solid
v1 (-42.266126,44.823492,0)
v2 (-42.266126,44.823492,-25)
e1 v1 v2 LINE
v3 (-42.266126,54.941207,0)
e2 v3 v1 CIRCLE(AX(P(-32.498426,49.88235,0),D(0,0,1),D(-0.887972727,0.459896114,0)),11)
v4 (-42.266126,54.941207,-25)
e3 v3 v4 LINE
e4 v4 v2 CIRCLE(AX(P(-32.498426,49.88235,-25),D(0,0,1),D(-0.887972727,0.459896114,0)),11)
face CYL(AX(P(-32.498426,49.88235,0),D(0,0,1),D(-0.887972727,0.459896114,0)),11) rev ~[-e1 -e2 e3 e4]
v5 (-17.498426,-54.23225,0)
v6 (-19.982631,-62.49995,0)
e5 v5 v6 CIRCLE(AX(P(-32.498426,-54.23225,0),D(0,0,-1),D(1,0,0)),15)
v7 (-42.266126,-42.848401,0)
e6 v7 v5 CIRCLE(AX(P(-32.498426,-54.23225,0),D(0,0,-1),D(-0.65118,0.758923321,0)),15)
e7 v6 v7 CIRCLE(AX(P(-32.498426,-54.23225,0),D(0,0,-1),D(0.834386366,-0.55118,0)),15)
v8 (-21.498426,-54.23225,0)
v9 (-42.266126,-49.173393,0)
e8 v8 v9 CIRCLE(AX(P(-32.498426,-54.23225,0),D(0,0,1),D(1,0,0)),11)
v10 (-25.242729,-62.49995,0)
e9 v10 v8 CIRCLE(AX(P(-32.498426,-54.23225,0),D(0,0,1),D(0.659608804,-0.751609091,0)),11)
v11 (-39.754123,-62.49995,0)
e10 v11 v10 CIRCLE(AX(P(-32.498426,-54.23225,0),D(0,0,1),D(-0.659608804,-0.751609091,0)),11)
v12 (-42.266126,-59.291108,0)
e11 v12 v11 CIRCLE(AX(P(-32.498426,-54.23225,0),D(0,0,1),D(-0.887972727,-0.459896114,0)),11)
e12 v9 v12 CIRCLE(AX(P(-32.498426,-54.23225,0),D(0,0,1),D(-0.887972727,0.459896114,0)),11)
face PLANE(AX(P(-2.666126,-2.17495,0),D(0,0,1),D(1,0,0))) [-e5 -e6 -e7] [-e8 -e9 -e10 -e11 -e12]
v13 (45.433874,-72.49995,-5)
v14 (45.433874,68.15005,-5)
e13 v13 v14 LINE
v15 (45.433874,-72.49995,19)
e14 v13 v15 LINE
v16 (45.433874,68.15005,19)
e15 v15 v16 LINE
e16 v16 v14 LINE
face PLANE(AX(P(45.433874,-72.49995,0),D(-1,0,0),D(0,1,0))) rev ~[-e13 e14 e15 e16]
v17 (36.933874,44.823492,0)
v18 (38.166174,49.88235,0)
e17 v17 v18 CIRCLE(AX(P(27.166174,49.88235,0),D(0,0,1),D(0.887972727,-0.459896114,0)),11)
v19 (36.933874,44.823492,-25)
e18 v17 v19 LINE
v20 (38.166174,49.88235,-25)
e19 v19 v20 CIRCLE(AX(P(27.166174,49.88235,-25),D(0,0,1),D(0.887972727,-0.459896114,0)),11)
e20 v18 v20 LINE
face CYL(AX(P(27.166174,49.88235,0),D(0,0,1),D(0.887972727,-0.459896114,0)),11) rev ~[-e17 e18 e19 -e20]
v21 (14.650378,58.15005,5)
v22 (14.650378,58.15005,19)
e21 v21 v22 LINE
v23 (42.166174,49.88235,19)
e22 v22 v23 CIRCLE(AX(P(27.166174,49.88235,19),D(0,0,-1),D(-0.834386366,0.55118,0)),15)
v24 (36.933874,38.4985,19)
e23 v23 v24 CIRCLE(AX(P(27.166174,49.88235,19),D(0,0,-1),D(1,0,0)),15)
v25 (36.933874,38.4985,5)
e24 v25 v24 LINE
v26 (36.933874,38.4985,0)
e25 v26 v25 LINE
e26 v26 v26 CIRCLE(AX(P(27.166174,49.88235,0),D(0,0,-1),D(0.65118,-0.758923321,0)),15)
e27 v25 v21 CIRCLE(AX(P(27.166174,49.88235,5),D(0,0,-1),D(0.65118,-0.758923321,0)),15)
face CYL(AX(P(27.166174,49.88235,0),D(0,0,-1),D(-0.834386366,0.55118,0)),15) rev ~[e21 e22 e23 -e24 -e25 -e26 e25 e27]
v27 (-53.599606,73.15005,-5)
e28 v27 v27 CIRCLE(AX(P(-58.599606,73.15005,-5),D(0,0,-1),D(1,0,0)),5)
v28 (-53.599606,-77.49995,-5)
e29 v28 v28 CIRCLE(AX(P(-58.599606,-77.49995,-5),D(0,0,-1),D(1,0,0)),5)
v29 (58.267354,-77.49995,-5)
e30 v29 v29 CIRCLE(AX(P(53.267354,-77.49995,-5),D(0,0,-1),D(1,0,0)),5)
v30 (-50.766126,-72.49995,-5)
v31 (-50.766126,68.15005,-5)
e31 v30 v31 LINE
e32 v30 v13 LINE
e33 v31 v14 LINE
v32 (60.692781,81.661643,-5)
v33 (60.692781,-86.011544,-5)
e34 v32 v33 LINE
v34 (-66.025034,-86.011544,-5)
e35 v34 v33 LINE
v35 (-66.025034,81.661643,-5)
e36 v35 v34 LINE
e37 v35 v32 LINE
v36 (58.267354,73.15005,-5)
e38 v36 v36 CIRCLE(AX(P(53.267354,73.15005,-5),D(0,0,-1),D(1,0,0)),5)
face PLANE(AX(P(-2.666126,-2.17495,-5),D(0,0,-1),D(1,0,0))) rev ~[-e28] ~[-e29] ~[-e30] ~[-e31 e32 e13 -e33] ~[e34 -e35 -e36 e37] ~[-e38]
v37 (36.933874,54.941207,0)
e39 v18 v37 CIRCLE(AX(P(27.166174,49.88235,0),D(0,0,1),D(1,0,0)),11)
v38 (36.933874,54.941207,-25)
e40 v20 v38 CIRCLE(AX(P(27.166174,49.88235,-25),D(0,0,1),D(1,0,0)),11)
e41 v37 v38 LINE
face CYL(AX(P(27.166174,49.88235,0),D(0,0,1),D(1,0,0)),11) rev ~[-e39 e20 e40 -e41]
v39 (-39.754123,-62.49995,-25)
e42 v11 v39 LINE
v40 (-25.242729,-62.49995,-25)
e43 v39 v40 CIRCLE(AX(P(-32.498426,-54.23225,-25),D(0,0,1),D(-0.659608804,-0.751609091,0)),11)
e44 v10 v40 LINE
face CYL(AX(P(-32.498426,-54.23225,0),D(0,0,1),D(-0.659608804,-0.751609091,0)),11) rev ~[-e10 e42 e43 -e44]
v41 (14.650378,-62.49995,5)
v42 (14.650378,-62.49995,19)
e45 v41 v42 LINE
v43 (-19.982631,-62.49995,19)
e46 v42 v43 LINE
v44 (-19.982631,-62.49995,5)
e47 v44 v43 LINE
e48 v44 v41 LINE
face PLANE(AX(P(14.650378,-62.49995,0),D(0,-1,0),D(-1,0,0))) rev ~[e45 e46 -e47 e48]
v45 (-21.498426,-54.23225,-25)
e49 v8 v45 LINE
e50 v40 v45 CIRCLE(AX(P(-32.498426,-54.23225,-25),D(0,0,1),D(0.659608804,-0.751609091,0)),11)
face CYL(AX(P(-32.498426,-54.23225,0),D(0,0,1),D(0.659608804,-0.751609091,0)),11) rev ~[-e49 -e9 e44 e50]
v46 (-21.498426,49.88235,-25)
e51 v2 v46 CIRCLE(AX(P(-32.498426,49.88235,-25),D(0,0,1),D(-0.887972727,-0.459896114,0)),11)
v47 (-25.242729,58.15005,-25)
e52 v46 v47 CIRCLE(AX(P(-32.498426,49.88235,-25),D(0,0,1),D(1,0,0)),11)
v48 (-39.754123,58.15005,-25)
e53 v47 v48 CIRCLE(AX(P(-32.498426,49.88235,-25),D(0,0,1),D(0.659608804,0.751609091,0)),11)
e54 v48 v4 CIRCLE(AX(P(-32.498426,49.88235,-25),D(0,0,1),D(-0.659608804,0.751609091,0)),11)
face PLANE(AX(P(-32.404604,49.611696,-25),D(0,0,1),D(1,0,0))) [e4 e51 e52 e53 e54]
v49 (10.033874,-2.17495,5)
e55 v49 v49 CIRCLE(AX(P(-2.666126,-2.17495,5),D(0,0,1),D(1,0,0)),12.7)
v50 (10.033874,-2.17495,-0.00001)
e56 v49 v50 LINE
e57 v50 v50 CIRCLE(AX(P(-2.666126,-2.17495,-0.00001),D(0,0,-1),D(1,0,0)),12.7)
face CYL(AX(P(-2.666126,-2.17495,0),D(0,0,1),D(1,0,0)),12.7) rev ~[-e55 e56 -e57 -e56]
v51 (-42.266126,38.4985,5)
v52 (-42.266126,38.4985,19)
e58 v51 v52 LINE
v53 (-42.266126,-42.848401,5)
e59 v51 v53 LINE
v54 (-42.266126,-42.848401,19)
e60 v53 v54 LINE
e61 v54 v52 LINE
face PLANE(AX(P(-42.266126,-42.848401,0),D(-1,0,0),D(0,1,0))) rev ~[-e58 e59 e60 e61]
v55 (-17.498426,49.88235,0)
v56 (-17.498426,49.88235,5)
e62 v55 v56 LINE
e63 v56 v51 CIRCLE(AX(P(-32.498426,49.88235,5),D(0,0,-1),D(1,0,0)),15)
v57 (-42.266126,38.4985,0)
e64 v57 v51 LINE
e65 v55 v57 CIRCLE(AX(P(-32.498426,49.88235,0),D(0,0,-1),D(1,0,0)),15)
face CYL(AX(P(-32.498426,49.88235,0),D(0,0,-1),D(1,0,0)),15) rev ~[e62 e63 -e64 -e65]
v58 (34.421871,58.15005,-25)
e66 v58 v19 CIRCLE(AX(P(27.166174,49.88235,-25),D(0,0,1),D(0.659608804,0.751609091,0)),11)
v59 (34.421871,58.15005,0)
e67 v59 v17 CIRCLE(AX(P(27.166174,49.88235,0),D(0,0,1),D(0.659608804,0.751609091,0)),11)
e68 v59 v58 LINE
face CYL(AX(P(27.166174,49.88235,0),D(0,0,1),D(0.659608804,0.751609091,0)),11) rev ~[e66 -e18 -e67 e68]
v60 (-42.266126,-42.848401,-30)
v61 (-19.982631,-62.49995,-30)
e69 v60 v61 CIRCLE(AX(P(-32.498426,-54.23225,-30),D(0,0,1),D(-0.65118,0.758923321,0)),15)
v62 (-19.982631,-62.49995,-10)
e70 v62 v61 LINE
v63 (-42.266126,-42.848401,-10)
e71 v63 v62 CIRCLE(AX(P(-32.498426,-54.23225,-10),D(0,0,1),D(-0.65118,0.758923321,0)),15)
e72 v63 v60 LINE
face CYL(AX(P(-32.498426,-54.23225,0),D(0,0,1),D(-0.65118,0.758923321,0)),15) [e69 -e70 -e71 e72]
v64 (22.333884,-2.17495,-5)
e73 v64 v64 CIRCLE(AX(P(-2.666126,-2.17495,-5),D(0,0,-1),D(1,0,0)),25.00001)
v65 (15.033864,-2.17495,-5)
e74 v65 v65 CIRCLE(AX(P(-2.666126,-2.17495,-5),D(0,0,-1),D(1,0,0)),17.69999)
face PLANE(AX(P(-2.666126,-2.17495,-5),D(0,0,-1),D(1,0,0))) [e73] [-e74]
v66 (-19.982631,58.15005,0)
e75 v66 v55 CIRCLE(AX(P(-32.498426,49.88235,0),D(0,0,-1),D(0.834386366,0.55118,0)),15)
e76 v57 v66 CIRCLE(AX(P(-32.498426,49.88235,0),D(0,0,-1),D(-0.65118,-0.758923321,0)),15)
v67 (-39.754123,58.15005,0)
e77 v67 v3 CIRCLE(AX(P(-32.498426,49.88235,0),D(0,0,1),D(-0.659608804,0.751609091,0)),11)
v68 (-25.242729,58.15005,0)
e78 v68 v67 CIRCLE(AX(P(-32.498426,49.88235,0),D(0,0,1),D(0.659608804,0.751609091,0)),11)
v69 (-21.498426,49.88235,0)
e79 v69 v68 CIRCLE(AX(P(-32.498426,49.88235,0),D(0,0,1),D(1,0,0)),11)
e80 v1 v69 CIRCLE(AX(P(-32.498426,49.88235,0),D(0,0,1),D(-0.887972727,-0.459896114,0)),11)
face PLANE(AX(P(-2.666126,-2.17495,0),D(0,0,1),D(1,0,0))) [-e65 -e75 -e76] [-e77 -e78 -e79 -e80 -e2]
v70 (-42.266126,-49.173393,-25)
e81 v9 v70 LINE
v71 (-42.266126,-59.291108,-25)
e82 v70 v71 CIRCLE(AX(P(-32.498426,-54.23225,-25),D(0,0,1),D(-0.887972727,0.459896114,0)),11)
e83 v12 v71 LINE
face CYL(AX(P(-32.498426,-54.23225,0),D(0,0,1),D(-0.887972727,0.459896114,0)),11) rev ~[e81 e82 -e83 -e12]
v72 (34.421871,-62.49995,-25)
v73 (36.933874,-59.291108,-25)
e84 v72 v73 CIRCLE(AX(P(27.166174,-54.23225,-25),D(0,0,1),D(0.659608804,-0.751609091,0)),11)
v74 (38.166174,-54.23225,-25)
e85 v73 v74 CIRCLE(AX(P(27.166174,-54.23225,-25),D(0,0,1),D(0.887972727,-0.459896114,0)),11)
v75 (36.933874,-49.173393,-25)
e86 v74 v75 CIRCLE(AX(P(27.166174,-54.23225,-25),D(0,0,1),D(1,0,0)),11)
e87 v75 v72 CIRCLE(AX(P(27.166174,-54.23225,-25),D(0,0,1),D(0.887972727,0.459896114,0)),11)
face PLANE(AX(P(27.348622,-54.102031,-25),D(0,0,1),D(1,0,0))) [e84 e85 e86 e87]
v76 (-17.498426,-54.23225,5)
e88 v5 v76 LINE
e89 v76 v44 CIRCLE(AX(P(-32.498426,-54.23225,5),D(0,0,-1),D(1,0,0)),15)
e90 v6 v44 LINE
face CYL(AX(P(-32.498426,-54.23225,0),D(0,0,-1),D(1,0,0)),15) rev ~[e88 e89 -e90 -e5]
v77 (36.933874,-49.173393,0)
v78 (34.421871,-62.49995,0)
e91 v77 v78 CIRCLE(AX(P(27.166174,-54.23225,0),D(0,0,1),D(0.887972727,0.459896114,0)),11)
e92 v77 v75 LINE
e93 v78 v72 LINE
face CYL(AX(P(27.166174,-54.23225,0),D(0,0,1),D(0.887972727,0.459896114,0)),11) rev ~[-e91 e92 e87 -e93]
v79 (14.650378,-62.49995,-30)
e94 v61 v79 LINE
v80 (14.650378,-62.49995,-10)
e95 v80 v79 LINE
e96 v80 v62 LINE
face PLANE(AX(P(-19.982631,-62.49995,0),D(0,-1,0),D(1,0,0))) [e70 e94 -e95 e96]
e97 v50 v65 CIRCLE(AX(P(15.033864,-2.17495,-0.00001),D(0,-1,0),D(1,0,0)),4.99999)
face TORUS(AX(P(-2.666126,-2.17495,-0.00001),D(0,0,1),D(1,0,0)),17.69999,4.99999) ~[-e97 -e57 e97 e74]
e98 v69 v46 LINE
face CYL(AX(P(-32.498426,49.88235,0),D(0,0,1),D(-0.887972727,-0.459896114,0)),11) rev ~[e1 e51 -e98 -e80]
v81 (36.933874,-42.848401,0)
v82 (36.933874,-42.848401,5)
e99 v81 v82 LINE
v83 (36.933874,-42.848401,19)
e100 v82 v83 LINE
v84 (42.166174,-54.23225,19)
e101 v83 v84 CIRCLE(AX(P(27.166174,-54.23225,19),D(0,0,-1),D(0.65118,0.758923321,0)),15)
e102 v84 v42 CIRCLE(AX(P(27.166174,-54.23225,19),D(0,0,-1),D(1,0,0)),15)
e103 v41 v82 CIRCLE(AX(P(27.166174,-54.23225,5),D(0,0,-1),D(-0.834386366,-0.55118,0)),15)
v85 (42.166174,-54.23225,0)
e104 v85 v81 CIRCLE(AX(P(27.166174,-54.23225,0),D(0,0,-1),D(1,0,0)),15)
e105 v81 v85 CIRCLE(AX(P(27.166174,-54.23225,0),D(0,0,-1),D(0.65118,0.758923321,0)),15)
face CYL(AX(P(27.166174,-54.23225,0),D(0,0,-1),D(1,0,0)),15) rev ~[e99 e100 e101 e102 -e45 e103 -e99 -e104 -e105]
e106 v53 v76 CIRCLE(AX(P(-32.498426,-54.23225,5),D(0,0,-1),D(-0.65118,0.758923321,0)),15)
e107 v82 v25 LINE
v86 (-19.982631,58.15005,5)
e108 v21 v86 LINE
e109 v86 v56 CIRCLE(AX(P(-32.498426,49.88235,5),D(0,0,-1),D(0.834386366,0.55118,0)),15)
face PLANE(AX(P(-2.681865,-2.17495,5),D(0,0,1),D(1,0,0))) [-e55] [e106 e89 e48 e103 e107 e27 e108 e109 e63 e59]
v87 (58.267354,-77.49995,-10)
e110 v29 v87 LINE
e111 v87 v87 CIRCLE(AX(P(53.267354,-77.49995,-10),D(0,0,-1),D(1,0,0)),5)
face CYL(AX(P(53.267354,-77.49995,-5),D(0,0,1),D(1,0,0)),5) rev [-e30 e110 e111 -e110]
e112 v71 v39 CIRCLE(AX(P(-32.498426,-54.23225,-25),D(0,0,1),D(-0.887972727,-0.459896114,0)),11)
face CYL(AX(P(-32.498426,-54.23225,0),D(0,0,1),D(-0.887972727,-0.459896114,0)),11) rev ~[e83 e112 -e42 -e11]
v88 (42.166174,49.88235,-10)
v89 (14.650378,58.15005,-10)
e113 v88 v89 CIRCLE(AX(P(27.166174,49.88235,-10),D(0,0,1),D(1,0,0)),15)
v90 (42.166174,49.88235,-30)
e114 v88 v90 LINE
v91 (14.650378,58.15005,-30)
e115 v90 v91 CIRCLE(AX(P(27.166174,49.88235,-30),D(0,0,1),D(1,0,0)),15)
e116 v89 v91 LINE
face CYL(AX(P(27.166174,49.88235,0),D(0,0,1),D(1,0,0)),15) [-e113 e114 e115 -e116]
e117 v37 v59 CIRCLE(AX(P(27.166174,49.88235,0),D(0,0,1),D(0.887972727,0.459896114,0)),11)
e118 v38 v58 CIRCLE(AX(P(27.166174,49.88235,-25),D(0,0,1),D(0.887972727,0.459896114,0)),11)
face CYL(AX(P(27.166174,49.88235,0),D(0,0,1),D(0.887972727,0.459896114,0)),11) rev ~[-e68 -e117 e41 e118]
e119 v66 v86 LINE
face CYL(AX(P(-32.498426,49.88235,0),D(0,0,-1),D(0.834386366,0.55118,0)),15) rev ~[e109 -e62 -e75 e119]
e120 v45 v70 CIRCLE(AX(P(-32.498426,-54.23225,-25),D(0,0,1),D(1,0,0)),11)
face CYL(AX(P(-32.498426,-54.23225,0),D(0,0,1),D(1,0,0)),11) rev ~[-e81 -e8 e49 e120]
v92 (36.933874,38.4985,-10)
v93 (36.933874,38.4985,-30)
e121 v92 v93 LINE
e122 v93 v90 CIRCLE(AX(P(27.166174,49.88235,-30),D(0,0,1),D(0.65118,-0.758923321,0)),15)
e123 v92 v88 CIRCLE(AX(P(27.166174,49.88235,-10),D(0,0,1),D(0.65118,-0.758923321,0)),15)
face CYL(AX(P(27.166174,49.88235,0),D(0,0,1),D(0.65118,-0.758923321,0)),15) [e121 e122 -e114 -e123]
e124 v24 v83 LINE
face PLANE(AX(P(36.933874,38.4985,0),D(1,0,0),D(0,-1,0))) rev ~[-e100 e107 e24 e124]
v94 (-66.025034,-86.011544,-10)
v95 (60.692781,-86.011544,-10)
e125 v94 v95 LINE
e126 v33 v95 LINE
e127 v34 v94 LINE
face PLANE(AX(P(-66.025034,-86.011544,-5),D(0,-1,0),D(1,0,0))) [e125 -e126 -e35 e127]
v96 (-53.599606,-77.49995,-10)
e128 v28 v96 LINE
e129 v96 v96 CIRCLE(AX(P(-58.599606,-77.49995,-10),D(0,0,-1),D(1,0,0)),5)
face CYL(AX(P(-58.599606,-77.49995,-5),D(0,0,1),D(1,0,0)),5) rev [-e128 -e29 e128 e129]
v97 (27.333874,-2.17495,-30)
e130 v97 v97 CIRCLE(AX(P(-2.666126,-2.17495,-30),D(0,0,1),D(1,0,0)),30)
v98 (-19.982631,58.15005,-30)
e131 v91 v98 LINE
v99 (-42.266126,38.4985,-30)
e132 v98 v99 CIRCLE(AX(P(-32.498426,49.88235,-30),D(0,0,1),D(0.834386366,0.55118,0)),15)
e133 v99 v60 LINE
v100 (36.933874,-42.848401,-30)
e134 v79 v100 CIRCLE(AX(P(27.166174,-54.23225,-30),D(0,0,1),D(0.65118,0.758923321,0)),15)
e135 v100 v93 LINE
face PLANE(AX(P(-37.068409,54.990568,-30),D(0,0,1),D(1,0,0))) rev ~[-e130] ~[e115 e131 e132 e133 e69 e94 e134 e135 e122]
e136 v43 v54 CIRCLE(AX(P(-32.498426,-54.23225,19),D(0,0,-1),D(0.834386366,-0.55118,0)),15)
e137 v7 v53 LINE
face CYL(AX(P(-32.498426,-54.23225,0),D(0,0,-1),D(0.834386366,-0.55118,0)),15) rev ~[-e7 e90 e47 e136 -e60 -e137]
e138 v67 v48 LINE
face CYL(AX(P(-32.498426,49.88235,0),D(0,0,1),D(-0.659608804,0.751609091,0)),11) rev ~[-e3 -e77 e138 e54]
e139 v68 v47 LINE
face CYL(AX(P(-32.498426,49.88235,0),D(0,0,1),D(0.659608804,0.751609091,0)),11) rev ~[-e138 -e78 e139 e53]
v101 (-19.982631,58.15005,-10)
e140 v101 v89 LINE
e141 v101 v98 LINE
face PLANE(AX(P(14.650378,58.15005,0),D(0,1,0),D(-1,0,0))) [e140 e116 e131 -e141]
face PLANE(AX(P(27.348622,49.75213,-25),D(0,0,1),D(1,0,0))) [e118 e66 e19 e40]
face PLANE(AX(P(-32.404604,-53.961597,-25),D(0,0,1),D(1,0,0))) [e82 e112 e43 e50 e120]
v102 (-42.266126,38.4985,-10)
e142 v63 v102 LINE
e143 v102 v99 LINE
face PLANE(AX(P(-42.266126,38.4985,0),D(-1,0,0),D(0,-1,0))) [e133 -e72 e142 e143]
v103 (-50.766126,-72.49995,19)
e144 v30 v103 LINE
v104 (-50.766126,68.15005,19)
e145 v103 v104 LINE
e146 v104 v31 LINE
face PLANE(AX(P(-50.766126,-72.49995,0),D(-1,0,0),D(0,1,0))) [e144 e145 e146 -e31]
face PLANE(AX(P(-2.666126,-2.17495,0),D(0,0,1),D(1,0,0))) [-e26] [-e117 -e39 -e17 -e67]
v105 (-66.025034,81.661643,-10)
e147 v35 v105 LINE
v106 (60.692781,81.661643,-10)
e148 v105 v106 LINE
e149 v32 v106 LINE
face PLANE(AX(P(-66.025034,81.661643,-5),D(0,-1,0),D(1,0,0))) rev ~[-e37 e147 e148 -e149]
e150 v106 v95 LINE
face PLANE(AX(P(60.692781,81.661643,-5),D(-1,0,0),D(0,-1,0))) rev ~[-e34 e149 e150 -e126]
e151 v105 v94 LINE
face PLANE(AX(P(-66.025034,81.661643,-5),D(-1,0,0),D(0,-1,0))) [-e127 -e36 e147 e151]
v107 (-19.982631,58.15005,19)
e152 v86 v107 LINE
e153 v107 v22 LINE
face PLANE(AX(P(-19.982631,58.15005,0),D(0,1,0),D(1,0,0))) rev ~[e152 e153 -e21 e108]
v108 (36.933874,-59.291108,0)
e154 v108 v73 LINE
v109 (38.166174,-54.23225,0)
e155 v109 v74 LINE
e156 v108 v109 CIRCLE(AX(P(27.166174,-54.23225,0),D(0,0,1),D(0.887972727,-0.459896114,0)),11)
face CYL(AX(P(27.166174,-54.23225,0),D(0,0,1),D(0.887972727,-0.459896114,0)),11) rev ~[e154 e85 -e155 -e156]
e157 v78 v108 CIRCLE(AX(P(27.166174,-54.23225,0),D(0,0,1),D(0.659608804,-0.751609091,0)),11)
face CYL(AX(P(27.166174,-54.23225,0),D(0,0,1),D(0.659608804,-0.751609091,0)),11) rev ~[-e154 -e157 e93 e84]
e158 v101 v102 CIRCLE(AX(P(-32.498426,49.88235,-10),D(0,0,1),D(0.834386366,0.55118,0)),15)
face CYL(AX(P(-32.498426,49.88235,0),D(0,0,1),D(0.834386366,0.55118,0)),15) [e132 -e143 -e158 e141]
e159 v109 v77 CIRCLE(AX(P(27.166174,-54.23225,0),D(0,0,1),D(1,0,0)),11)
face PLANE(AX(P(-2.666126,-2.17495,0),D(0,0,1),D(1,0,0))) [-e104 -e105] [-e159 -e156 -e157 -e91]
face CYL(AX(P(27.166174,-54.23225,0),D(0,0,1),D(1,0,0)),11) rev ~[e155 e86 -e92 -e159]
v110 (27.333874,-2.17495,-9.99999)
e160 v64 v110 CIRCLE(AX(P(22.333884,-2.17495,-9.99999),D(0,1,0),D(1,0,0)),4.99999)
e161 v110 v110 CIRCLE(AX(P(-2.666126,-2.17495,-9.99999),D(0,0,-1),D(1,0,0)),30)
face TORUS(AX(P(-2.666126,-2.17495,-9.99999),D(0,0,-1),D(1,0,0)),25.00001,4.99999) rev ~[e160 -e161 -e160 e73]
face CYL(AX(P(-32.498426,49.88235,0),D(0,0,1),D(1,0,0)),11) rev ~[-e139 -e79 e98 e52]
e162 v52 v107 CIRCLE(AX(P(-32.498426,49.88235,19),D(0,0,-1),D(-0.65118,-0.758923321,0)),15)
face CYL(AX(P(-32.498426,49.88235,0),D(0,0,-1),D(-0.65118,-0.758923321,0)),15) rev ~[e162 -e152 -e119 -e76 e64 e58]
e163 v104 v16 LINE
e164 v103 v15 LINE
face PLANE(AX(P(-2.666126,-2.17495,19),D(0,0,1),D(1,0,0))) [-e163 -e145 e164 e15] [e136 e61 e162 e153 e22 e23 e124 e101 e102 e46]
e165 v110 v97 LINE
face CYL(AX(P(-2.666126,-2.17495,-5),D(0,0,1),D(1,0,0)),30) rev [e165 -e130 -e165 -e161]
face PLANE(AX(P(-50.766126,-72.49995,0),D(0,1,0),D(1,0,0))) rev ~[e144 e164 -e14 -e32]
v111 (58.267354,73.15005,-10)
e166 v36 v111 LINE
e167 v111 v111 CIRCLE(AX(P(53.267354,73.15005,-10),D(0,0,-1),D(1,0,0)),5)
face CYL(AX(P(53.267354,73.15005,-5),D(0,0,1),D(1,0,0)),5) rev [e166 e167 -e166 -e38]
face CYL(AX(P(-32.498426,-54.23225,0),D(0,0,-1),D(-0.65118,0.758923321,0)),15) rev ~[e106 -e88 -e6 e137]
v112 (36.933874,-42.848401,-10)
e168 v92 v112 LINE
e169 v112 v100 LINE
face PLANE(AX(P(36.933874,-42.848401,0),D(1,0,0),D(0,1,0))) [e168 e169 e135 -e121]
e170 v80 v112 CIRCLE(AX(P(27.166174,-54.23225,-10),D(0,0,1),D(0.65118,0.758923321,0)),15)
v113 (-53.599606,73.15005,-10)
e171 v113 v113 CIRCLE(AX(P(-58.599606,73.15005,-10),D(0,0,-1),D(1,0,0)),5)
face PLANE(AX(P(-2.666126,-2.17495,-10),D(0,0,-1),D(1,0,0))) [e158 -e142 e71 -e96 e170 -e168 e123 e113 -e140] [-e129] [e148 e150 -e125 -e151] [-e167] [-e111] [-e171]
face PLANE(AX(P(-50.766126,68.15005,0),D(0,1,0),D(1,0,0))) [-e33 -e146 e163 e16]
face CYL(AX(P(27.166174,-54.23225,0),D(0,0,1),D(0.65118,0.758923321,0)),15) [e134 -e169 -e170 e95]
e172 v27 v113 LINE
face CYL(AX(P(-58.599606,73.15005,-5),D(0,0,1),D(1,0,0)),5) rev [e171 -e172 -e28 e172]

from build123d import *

# Parameters (mm, degrees)
F0_W      = 96.2
F0_H      = 140.65
F0_R      = 12.7
F1_DEPTH  = 5
F2_DEPTH  = 5
F3_DEPTH  = 19
F4_W      = 126.71781471
F4_H      = 167.6731868647
F4_R      = 5
F4_W_2    = 96.2
F4_H_2    = 140.65
F4_R_2    = 11
F4_R_3    = 30
F2_FACE_R = 12.7
F5_DEPTH  = 5
F6_DEPTH  = 30
F7_DEPTH  = 25
F8_R      = 12.7
F9_DEPTH  = 35
F4_R_4    = 12.7
F10_DEPTH = 35
F11_R     = 4.99999


# Not quite as in the source:
# - a fillet or chamfer is up to 0.001 mm smaller than in the source, because OpenCascade refuses the exact size


with BuildPart() as f1:
    # F0 (on Top) → F1 (new body)
    with BuildSketch(Plane.XY):
        with Locations((-2.6661262382, -2.1749504376)):
            Rectangle(F0_W, F0_H)
        with BuildLine():
            ThreePointArc((-42.2661262382, 38.498499743), (-42.4198102031, 61.1325113488), (-19.9826307497, 58.1500495624))
            Line((-19.9826307497, 58.1500495624), (14.6503782733, 58.1500495624))
            ThreePointArc((14.6503782733, 58.1500495624), (31.4825998108, 64.2478800491), (42.1661737618, 49.8823495624))
            ThreePointArc((42.1661737618, 49.8823495624), (40.7954712492, 43.6179860672), (36.9338737618, 38.498499743))
            Line((36.9338737618, 38.498499743), (36.9338737618, -42.8484006182))
            ThreePointArc((36.9338737618, -42.8484006182), (40.7954712492, -47.9678869424), (42.1661737618, -54.2322504376))
            ThreePointArc((42.1661737618, -54.2322504376), (31.4825998108, -68.5977809243), (14.6503782733, -62.4999504376))
            Line((14.6503782733, -62.4999504376), (-19.9826307497, -62.4999504376))
            ThreePointArc((-19.9826307497, -62.4999504376), (-42.4198102031, -65.482412224), (-42.2661262382, -42.8484006182))
            Line((-42.2661262382, -42.8484006182), (-42.2661262382, 38.498499743))
        make_face(mode=Mode.SUBTRACT)
        with BuildLine():
            Line((14.6503782733, 58.1500495624), (-19.9826307497, 58.1500495624))
            ThreePointArc((-19.9826307497, 58.1500495624), (-18.1328957515, 54.1987756114), (-17.4984262382, 49.8823495624))
            ThreePointArc((-17.4984262382, 49.8823495624), (-26.234062743, 36.253052075), (-42.2661262382, 38.498499743))
            Line((-42.2661262382, 38.498499743), (-42.2661262382, -42.8484006182))
            ThreePointArc((-42.2661262382, -42.8484006182), (-26.234062743, -40.6029529502), (-17.4984262382, -54.2322504376))
            ThreePointArc((-17.4984262382, -54.2322504376), (-18.1328957515, -58.5486764866), (-19.9826307497, -62.4999504376))
            Line((-19.9826307497, -62.4999504376), (14.6503782733, -62.4999504376))
            ThreePointArc((14.6503782733, -62.4999504376), (17.2447897969, -42.9820886512), (36.9338737618, -42.8484006182))
            Line((36.9338737618, -42.8484006182), (36.9338737618, 38.498499743))
            ThreePointArc((36.9338737618, 38.498499743), (17.2447897969, 38.632187776), (14.6503782733, 58.1500495624))
        make_face()
        with Locations((-2.6661262382, -2.1749504376)):
            Circle(F0_R, mode=Mode.SUBTRACT)
        with BuildLine():
            Line((-19.9826307497, 58.1500495624), (-25.2427293929, 58.1500495624))
            ThreePointArc((-25.2427293929, 58.1500495624), (-22.4781302022, 54.4203741713), (-21.4984262382, 49.8823495624))
            ThreePointArc((-21.4984262382, 49.8823495624), (-29.8950342201, 39.1948638899), (-42.2661262382, 44.823492309))
            Line((-42.2661262382, 44.823492309), (-42.2661262382, 38.498499743))
            ThreePointArc((-42.2661262382, 38.498499743), (-26.234062743, 36.253052075), (-17.4984262382, 49.8823495624))
            ThreePointArc((-17.4984262382, 49.8823495624), (-18.1328957515, 54.1987756114), (-19.9826307497, 58.1500495624))
        make_face()
        with BuildLine():
            Line((19.9104769166, 58.1500495624), (14.6503782733, 58.1500495624))
            ThreePointArc((14.6503782733, 58.1500495624), (17.2447897969, 38.632187776), (36.9338737618, 38.498499743))
            Line((36.9338737618, 38.498499743), (36.9338737618, 44.823492309))
            ThreePointArc((36.9338737618, 44.823492309), (20.3855526974, 41.2207574466), (19.9104769166, 58.1500495624))
        make_face()
        with BuildLine():
            ThreePointArc((-17.4984262382, -54.2322504376), (-26.234062743, -40.6029529502), (-42.2661262382, -42.8484006182))
            Line((-42.2661262382, -42.8484006182), (-42.2661262382, -49.1733931842))
            ThreePointArc((-42.2661262382, -49.1733931842), (-29.8950342201, -43.5447647651), (-21.4984262382, -54.2322504376))
            ThreePointArc((-21.4984262382, -54.2322504376), (-22.4781302022, -58.7702750465), (-25.2427293929, -62.4999504376))
            Line((-25.2427293929, -62.4999504376), (-19.9826307497, -62.4999504376))
            ThreePointArc((-19.9826307497, -62.4999504376), (-18.1328957515, -58.5486764866), (-17.4984262382, -54.2322504376))
        make_face()
        with BuildLine():
            Line((36.9338737618, -49.1733931842), (36.9338737618, -42.8484006182))
            ThreePointArc((36.9338737618, -42.8484006182), (17.2447897969, -42.9820886512), (14.6503782733, -62.4999504376))
            Line((14.6503782733, -62.4999504376), (19.9104769166, -62.4999504376))
            ThreePointArc((19.9104769166, -62.4999504376), (20.3855526974, -45.5706583218), (36.9338737618, -49.1733931842))
        make_face()
        with BuildLine():
            Line((-42.2661262382, 54.9412068158), (-42.2661262382, 58.1500495624))
            Line((-42.2661262382, 58.1500495624), (-39.7541230834, 58.1500495624))
            ThreePointArc((-39.7541230834, 58.1500495624), (-32.4984262382, 60.8823495624), (-25.2427293929, 58.1500495624))
            Line((-25.2427293929, 58.1500495624), (-19.9826307497, 58.1500495624))
            ThreePointArc((-19.9826307497, 58.1500495624), (-42.4198102031, 61.1325113488), (-42.2661262382, 38.498499743))
            Line((-42.2661262382, 38.498499743), (-42.2661262382, 44.823492309))
            ThreePointArc((-42.2661262382, 44.823492309), (-43.4984262382, 49.8823495624), (-42.2661262382, 54.9412068158))
        make_face()
        with BuildLine():
            ThreePointArc((42.1661737618, 49.8823495624), (31.4825998108, 64.2478800491), (14.6503782733, 58.1500495624))
            Line((14.6503782733, 58.1500495624), (19.9104769166, 58.1500495624))
            ThreePointArc((19.9104769166, 58.1500495624), (27.1661737618, 60.8823495624), (34.4218706071, 58.1500495624))
            Line((34.4218706071, 58.1500495624), (36.9338737618, 58.1500495624))
            Line((36.9338737618, 58.1500495624), (36.9338737618, 54.9412068158))
            ThreePointArc((36.9338737618, 54.9412068158), (37.8536594343, 52.4857415805), (38.1661737618, 49.8823495624))
            ThreePointArc((38.1661737618, 49.8823495624), (37.8536594343, 47.2789575443), (36.9338737618, 44.823492309))
            Line((36.9338737618, 44.823492309), (36.9338737618, 38.498499743))
            ThreePointArc((36.9338737618, 38.498499743), (40.7954712492, 43.6179860672), (42.1661737618, 49.8823495624))
        make_face()
        with BuildLine():
            Line((-42.2661262382, -49.1733931842), (-42.2661262382, -42.8484006182))
            ThreePointArc((-42.2661262382, -42.8484006182), (-42.4198102031, -65.482412224), (-19.9826307497, -62.4999504376))
            Line((-19.9826307497, -62.4999504376), (-25.2427293929, -62.4999504376))
            ThreePointArc((-25.2427293929, -62.4999504376), (-32.4984262382, -65.2322504376), (-39.7541230834, -62.4999504376))
            Line((-39.7541230834, -62.4999504376), (-42.2661262382, -62.4999504376))
            Line((-42.2661262382, -62.4999504376), (-42.2661262382, -59.291107691))
            ThreePointArc((-42.2661262382, -59.291107691), (-43.4984262382, -54.2322504376), (-42.2661262382, -49.1733931842))
        make_face()
        with BuildLine():
            ThreePointArc((42.1661737618, -54.2322504376), (40.7954712492, -47.9678869424), (36.9338737618, -42.8484006182))
            Line((36.9338737618, -42.8484006182), (36.9338737618, -49.1733931842))
            ThreePointArc((36.9338737618, -49.1733931842), (37.8536594343, -51.6288584195), (38.1661737618, -54.2322504376))
            ThreePointArc((38.1661737618, -54.2322504376), (37.8536594343, -56.8356424557), (36.9338737618, -59.291107691))
            Line((36.9338737618, -59.291107691), (36.9338737618, -62.4999504376))
            Line((36.9338737618, -62.4999504376), (34.4218706071, -62.4999504376))
            ThreePointArc((34.4218706071, -62.4999504376), (27.1661737618, -65.2322504376), (19.9104769166, -62.4999504376))
            Line((19.9104769166, -62.4999504376), (14.6503782733, -62.4999504376))
            ThreePointArc((14.6503782733, -62.4999504376), (31.4825998108, -68.5977809243), (42.1661737618, -54.2322504376))
        make_face()
        with BuildLine():
            Line((36.9338737618, 58.1500495624), (34.4218706071, 58.1500495624))
            ThreePointArc((34.4218706071, 58.1500495624), (35.8277658776, 56.6629706268), (36.9338737618, 54.9412068158))
            Line((36.9338737618, 54.9412068158), (36.9338737618, 58.1500495624))
        make_face()
        with BuildLine():
            Line((-39.7541230834, 58.1500495624), (-42.2661262382, 58.1500495624))
            Line((-42.2661262382, 58.1500495624), (-42.2661262382, 54.9412068158))
            ThreePointArc((-42.2661262382, 54.9412068158), (-41.160018354, 56.6629706268), (-39.7541230834, 58.1500495624))
        make_face()
        with BuildLine():
            Line((36.9338737618, -62.4999504376), (36.9338737618, -59.291107691))
            ThreePointArc((36.9338737618, -59.291107691), (35.8277658776, -61.012871502), (34.4218706071, -62.4999504376))
            Line((34.4218706071, -62.4999504376), (36.9338737618, -62.4999504376))
        make_face()
        with BuildLine():
            ThreePointArc((-39.7541230834, -62.4999504376), (-41.160018354, -61.012871502), (-42.2661262382, -59.291107691))
            Line((-42.2661262382, -59.291107691), (-42.2661262382, -62.4999504376))
            Line((-42.2661262382, -62.4999504376), (-39.7541230834, -62.4999504376))
        make_face()
    extrude(amount=-F1_DEPTH)

    # F0 (on Top) → F2 (join)
    with BuildSketch(Plane.XY):
        with BuildLine():
            Line((14.6503782733, 58.1500495624), (-19.9826307497, 58.1500495624))
            ThreePointArc((-19.9826307497, 58.1500495624), (-18.1328957515, 54.1987756114), (-17.4984262382, 49.8823495624))
            ThreePointArc((-17.4984262382, 49.8823495624), (-26.234062743, 36.253052075), (-42.2661262382, 38.498499743))
            Line((-42.2661262382, 38.498499743), (-42.2661262382, -42.8484006182))
            ThreePointArc((-42.2661262382, -42.8484006182), (-26.234062743, -40.6029529502), (-17.4984262382, -54.2322504376))
            ThreePointArc((-17.4984262382, -54.2322504376), (-18.1328957515, -58.5486764866), (-19.9826307497, -62.4999504376))
            Line((-19.9826307497, -62.4999504376), (14.6503782733, -62.4999504376))
            ThreePointArc((14.6503782733, -62.4999504376), (17.2447897969, -42.9820886512), (36.9338737618, -42.8484006182))
            Line((36.9338737618, -42.8484006182), (36.9338737618, 38.498499743))
            ThreePointArc((36.9338737618, 38.498499743), (17.2447897969, 38.632187776), (14.6503782733, 58.1500495624))
        make_face()
        with Locations((-2.6661262382, -2.1749504376)):
            Circle(F0_R, mode=Mode.SUBTRACT)
    extrude(amount=F2_DEPTH)

    # F0 (on Top) → F3 (join)
    with BuildSketch(Plane.XY):
        with Locations((-2.6661262382, -2.1749504376)):
            Rectangle(F0_W, F0_H)
        with BuildLine():
            ThreePointArc((-42.2661262382, 38.498499743), (-42.4198102031, 61.1325113488), (-19.9826307497, 58.1500495624))
            Line((-19.9826307497, 58.1500495624), (14.6503782733, 58.1500495624))
            ThreePointArc((14.6503782733, 58.1500495624), (31.4825998108, 64.2478800491), (42.1661737618, 49.8823495624))
            ThreePointArc((42.1661737618, 49.8823495624), (40.7954712492, 43.6179860672), (36.9338737618, 38.498499743))
            Line((36.9338737618, 38.498499743), (36.9338737618, -42.8484006182))
            ThreePointArc((36.9338737618, -42.8484006182), (40.7954712492, -47.9678869424), (42.1661737618, -54.2322504376))
            ThreePointArc((42.1661737618, -54.2322504376), (31.4825998108, -68.5977809243), (14.6503782733, -62.4999504376))
            Line((14.6503782733, -62.4999504376), (-19.9826307497, -62.4999504376))
            ThreePointArc((-19.9826307497, -62.4999504376), (-42.4198102031, -65.482412224), (-42.2661262382, -42.8484006182))
            Line((-42.2661262382, -42.8484006182), (-42.2661262382, 38.498499743))
        make_face(mode=Mode.SUBTRACT)
    extrude(amount=F3_DEPTH)

    # F4 (on face) + F2_face (on face) → F5 (join)
    with BuildSketch(Plane(origin=(0, 0, -5), x_dir=(1, 0, 0), z_dir=(0, 0, -1))):
        with Locations((-2.6661262382, 2.1749504376)):
            Rectangle(F4_W, F4_H)
        with Locations((-58.5996061093, -73.1500495624)):
            Circle(F4_R, mode=Mode.SUBTRACT)
        with Locations((53.2673536329, -73.1500495624)):
            Circle(F4_R, mode=Mode.SUBTRACT)
        with Locations((-2.6661262382, 2.1749504376)):
            Rectangle(F4_W_2, F4_H_2, mode=Mode.SUBTRACT)
        with Locations((-58.5996061093, 77.4999504376)):
            Circle(F4_R, mode=Mode.SUBTRACT)
        with Locations((53.2673536329, 77.4999504376)):
            Circle(F4_R, mode=Mode.SUBTRACT)
        with Locations((-2.6661262382, 2.1749504376)):
            Rectangle(F4_W_2, F4_H_2)
        with Locations((-32.4984262382, -49.8823495624)):
            Circle(F4_R_2, mode=Mode.SUBTRACT)
        with Locations((27.1661737618, -49.8823495624)):
            Circle(F4_R_2, mode=Mode.SUBTRACT)
        with Locations((-32.4984262382, 54.2322504376)):
            Circle(F4_R_2, mode=Mode.SUBTRACT)
        with Locations((-2.6661262382, 2.1749504376)):
            Circle(F4_R_3, mode=Mode.SUBTRACT)
        with Locations((27.1661737618, 54.2322504376)):
            Circle(F4_R_2, mode=Mode.SUBTRACT)
    with BuildSketch(Plane(origin=(-2.6661262382, -2.1749504376, 5), x_dir=(1, 0, 0), z_dir=(0, 0, 1))):
        with BuildLine():
            Line((17.3165045115, 60.325), (-17.3165045115, 60.325))
            ThreePointArc((-17.3165045115, 60.325), (-19.9109160351, 40.8071382136), (-39.6, 40.6734501806))
            Line((-39.6, 40.6734501806), (-39.6, -40.6734501806))
            ThreePointArc((-39.6, -40.6734501806), (-19.9109160351, -40.8071382136), (-17.3165045115, -60.325))
            Line((-17.3165045115, -60.325), (17.3165045115, -60.325))
            ThreePointArc((17.3165045115, -60.325), (19.9109160351, -40.8071382136), (39.6, -40.6734501806))
            Line((39.6, -40.6734501806), (39.6, 40.6734501806))
            ThreePointArc((39.6, 40.6734501806), (19.9109160351, 40.8071382136), (17.3165045115, 60.325))
        make_face()
        Circle(F2_FACE_R, mode=Mode.SUBTRACT)
    extrude(amount=F5_DEPTH, dir=(0, 0, -1))

    # F0 (on Top) → F6 (join)
    with BuildSketch(Plane.XY):
        with BuildLine():
            Line((-42.2661262382, 54.9412068158), (-42.2661262382, 58.1500495624))
            Line((-42.2661262382, 58.1500495624), (-39.7541230834, 58.1500495624))
            ThreePointArc((-39.7541230834, 58.1500495624), (-32.4984262382, 60.8823495624), (-25.2427293929, 58.1500495624))
            Line((-25.2427293929, 58.1500495624), (-19.9826307497, 58.1500495624))
            ThreePointArc((-19.9826307497, 58.1500495624), (-42.4198102031, 61.1325113488), (-42.2661262382, 38.498499743))
            Line((-42.2661262382, 38.498499743), (-42.2661262382, 44.823492309))
            ThreePointArc((-42.2661262382, 44.823492309), (-43.4984262382, 49.8823495624), (-42.2661262382, 54.9412068158))
        make_face()
        with BuildLine():
            ThreePointArc((-25.2427293929, 58.1500495624), (-32.4984262382, 60.8823495624), (-39.7541230834, 58.1500495624))
            Line((-39.7541230834, 58.1500495624), (-25.2427293929, 58.1500495624))
        make_face()
        with BuildLine():
            Line((-39.7541230834, 58.1500495624), (-42.2661262382, 58.1500495624))
            Line((-42.2661262382, 58.1500495624), (-42.2661262382, 54.9412068158))
            ThreePointArc((-42.2661262382, 54.9412068158), (-41.160018354, 56.6629706268), (-39.7541230834, 58.1500495624))
        make_face()
        with BuildLine():
            Line((-42.2661262382, 44.823492309), (-42.2661262382, 54.9412068158))
            ThreePointArc((-42.2661262382, 54.9412068158), (-43.4984262382, 49.8823495624), (-42.2661262382, 44.823492309))
        make_face()
        with BuildLine():
            Line((-19.9826307497, 58.1500495624), (-25.2427293929, 58.1500495624))
            ThreePointArc((-25.2427293929, 58.1500495624), (-22.4781302022, 54.4203741713), (-21.4984262382, 49.8823495624))
            ThreePointArc((-21.4984262382, 49.8823495624), (-29.8950342201, 39.1948638899), (-42.2661262382, 44.823492309))
            Line((-42.2661262382, 44.823492309), (-42.2661262382, 38.498499743))
            ThreePointArc((-42.2661262382, 38.498499743), (-26.234062743, 36.253052075), (-17.4984262382, 49.8823495624))
            ThreePointArc((-17.4984262382, 49.8823495624), (-18.1328957515, 54.1987756114), (-19.9826307497, 58.1500495624))
        make_face()
        with BuildLine():
            Line((-25.2427293929, 58.1500495624), (-39.7541230834, 58.1500495624))
            ThreePointArc((-39.7541230834, 58.1500495624), (-41.160018354, 56.6629706268), (-42.2661262382, 54.9412068158))
            Line((-42.2661262382, 54.9412068158), (-42.2661262382, 44.823492309))
            ThreePointArc((-42.2661262382, 44.823492309), (-29.8950342201, 39.1948638899), (-21.4984262382, 49.8823495624))
            ThreePointArc((-21.4984262382, 49.8823495624), (-22.4781302022, 54.4203741713), (-25.2427293929, 58.1500495624))
        make_face()
        with BuildLine():
            ThreePointArc((42.1661737618, 49.8823495624), (31.4825998108, 64.2478800491), (14.6503782733, 58.1500495624))
            Line((14.6503782733, 58.1500495624), (19.9104769166, 58.1500495624))
            ThreePointArc((19.9104769166, 58.1500495624), (27.1661737618, 60.8823495624), (34.4218706071, 58.1500495624))
            Line((34.4218706071, 58.1500495624), (36.9338737618, 58.1500495624))
            Line((36.9338737618, 58.1500495624), (36.9338737618, 54.9412068158))
            ThreePointArc((36.9338737618, 54.9412068158), (37.8536594343, 52.4857415805), (38.1661737618, 49.8823495624))
            ThreePointArc((38.1661737618, 49.8823495624), (37.8536594343, 47.2789575443), (36.9338737618, 44.823492309))
            Line((36.9338737618, 44.823492309), (36.9338737618, 38.498499743))
            ThreePointArc((36.9338737618, 38.498499743), (40.7954712492, 43.6179860672), (42.1661737618, 49.8823495624))
        make_face()
        with BuildLine():
            Line((36.9338737618, 54.9412068158), (36.9338737618, 44.823492309))
            ThreePointArc((36.9338737618, 44.823492309), (37.8536594343, 47.2789575443), (38.1661737618, 49.8823495624))
            ThreePointArc((38.1661737618, 49.8823495624), (37.8536594343, 52.4857415805), (36.9338737618, 54.9412068158))
        make_face()
        with BuildLine():
            Line((34.4218706071, 58.1500495624), (19.9104769166, 58.1500495624))
            ThreePointArc((19.9104769166, 58.1500495624), (20.3855526974, 41.2207574466), (36.9338737618, 44.823492309))
            Line((36.9338737618, 44.823492309), (36.9338737618, 54.9412068158))
            ThreePointArc((36.9338737618, 54.9412068158), (35.8277658776, 56.6629706268), (34.4218706071, 58.1500495624))
        make_face()
        with BuildLine():
            Line((36.9338737618, 58.1500495624), (34.4218706071, 58.1500495624))
            ThreePointArc((34.4218706071, 58.1500495624), (35.8277658776, 56.6629706268), (36.9338737618, 54.9412068158))
            Line((36.9338737618, 54.9412068158), (36.9338737618, 58.1500495624))
        make_face()
        with BuildLine():
            ThreePointArc((34.4218706071, 58.1500495624), (27.1661737618, 60.8823495624), (19.9104769166, 58.1500495624))
            Line((19.9104769166, 58.1500495624), (34.4218706071, 58.1500495624))
        make_face()
        with BuildLine():
            Line((19.9104769166, 58.1500495624), (14.6503782733, 58.1500495624))
            ThreePointArc((14.6503782733, 58.1500495624), (17.2447897969, 38.632187776), (36.9338737618, 38.498499743))
            Line((36.9338737618, 38.498499743), (36.9338737618, 44.823492309))
            ThreePointArc((36.9338737618, 44.823492309), (20.3855526974, 41.2207574466), (19.9104769166, 58.1500495624))
        make_face()
        with BuildLine():
            ThreePointArc((42.1661737618, -54.2322504376), (40.7954712492, -47.9678869424), (36.9338737618, -42.8484006182))
            Line((36.9338737618, -42.8484006182), (36.9338737618, -49.1733931842))
            ThreePointArc((36.9338737618, -49.1733931842), (37.8536594343, -51.6288584195), (38.1661737618, -54.2322504376))
            ThreePointArc((38.1661737618, -54.2322504376), (37.8536594343, -56.8356424557), (36.9338737618, -59.291107691))
            Line((36.9338737618, -59.291107691), (36.9338737618, -62.4999504376))
            Line((36.9338737618, -62.4999504376), (34.4218706071, -62.4999504376))
            ThreePointArc((34.4218706071, -62.4999504376), (27.1661737618, -65.2322504376), (19.9104769166, -62.4999504376))
            Line((19.9104769166, -62.4999504376), (14.6503782733, -62.4999504376))
            ThreePointArc((14.6503782733, -62.4999504376), (31.4825998108, -68.5977809243), (42.1661737618, -54.2322504376))
        make_face()
        with BuildLine():
            Line((36.9338737618, -49.1733931842), (36.9338737618, -42.8484006182))
            ThreePointArc((36.9338737618, -42.8484006182), (17.2447897969, -42.9820886512), (14.6503782733, -62.4999504376))
            Line((14.6503782733, -62.4999504376), (19.9104769166, -62.4999504376))
            ThreePointArc((19.9104769166, -62.4999504376), (20.3855526974, -45.5706583218), (36.9338737618, -49.1733931842))
        make_face()
        with BuildLine():
            Line((36.9338737618, -59.291107691), (36.9338737618, -49.1733931842))
            ThreePointArc((36.9338737618, -49.1733931842), (20.3855526974, -45.5706583218), (19.9104769166, -62.4999504376))
            Line((19.9104769166, -62.4999504376), (34.4218706071, -62.4999504376))
            ThreePointArc((34.4218706071, -62.4999504376), (35.8277658776, -61.012871502), (36.9338737618, -59.291107691))
        make_face()
        with BuildLine():
            Line((34.4218706071, -62.4999504376), (19.9104769166, -62.4999504376))
            ThreePointArc((19.9104769166, -62.4999504376), (27.1661737618, -65.2322504376), (34.4218706071, -62.4999504376))
        make_face()
        with BuildLine():
            ThreePointArc((38.1661737618, -54.2322504376), (37.8536594343, -51.6288584195), (36.9338737618, -49.1733931842))
            Line((36.9338737618, -49.1733931842), (36.9338737618, -59.291107691))
            ThreePointArc((36.9338737618, -59.291107691), (37.8536594343, -56.8356424557), (38.1661737618, -54.2322504376))
        make_face()
        with BuildLine():
            Line((36.9338737618, -62.4999504376), (36.9338737618, -59.291107691))
            ThreePointArc((36.9338737618, -59.291107691), (35.8277658776, -61.012871502), (34.4218706071, -62.4999504376))
            Line((34.4218706071, -62.4999504376), (36.9338737618, -62.4999504376))
        make_face()
        with BuildLine():
            Line((-42.2661262382, -49.1733931842), (-42.2661262382, -42.8484006182))
            ThreePointArc((-42.2661262382, -42.8484006182), (-42.4198102031, -65.482412224), (-19.9826307497, -62.4999504376))
            Line((-19.9826307497, -62.4999504376), (-25.2427293929, -62.4999504376))
            ThreePointArc((-25.2427293929, -62.4999504376), (-32.4984262382, -65.2322504376), (-39.7541230834, -62.4999504376))
            Line((-39.7541230834, -62.4999504376), (-42.2661262382, -62.4999504376))
            Line((-42.2661262382, -62.4999504376), (-42.2661262382, -59.291107691))
            ThreePointArc((-42.2661262382, -59.291107691), (-43.4984262382, -54.2322504376), (-42.2661262382, -49.1733931842))
        make_face()
        with BuildLine():
            ThreePointArc((-17.4984262382, -54.2322504376), (-26.234062743, -40.6029529502), (-42.2661262382, -42.8484006182))
            Line((-42.2661262382, -42.8484006182), (-42.2661262382, -49.1733931842))
            ThreePointArc((-42.2661262382, -49.1733931842), (-29.8950342201, -43.5447647651), (-21.4984262382, -54.2322504376))
            ThreePointArc((-21.4984262382, -54.2322504376), (-22.4781302022, -58.7702750465), (-25.2427293929, -62.4999504376))
            Line((-25.2427293929, -62.4999504376), (-19.9826307497, -62.4999504376))
            ThreePointArc((-19.9826307497, -62.4999504376), (-18.1328957515, -58.5486764866), (-17.4984262382, -54.2322504376))
        make_face()
        with BuildLine():
            ThreePointArc((-21.4984262382, -54.2322504376), (-29.8950342201, -43.5447647651), (-42.2661262382, -49.1733931842))
            Line((-42.2661262382, -49.1733931842), (-42.2661262382, -59.291107691))
            ThreePointArc((-42.2661262382, -59.291107691), (-41.160018354, -61.012871502), (-39.7541230834, -62.4999504376))
            Line((-39.7541230834, -62.4999504376), (-25.2427293929, -62.4999504376))
            ThreePointArc((-25.2427293929, -62.4999504376), (-22.4781302022, -58.7702750465), (-21.4984262382, -54.2322504376))
        make_face()
        with BuildLine():
            Line((-42.2661262382, -59.291107691), (-42.2661262382, -49.1733931842))
            ThreePointArc((-42.2661262382, -49.1733931842), (-43.4984262382, -54.2322504376), (-42.2661262382, -59.291107691))
        make_face()
        with BuildLine():
            ThreePointArc((-39.7541230834, -62.4999504376), (-41.160018354, -61.012871502), (-42.2661262382, -59.291107691))
            Line((-42.2661262382, -59.291107691), (-42.2661262382, -62.4999504376))
            Line((-42.2661262382, -62.4999504376), (-39.7541230834, -62.4999504376))
        make_face()
        with BuildLine():
            ThreePointArc((-39.7541230834, -62.4999504376), (-32.4984262382, -65.2322504376), (-25.2427293929, -62.4999504376))
            Line((-25.2427293929, -62.4999504376), (-39.7541230834, -62.4999504376))
        make_face()
        with BuildLine():
            Line((14.6503782733, 58.1500495624), (-19.9826307497, 58.1500495624))
            ThreePointArc((-19.9826307497, 58.1500495624), (-18.1328957515, 54.1987756114), (-17.4984262382, 49.8823495624))
            ThreePointArc((-17.4984262382, 49.8823495624), (-26.234062743, 36.253052075), (-42.2661262382, 38.498499743))
            Line((-42.2661262382, 38.498499743), (-42.2661262382, -42.8484006182))
            ThreePointArc((-42.2661262382, -42.8484006182), (-26.234062743, -40.6029529502), (-17.4984262382, -54.2322504376))
            ThreePointArc((-17.4984262382, -54.2322504376), (-18.1328957515, -58.5486764866), (-19.9826307497, -62.4999504376))
            Line((-19.9826307497, -62.4999504376), (14.6503782733, -62.4999504376))
            ThreePointArc((14.6503782733, -62.4999504376), (17.2447897969, -42.9820886512), (36.9338737618, -42.8484006182))
            Line((36.9338737618, -42.8484006182), (36.9338737618, 38.498499743))
            ThreePointArc((36.9338737618, 38.498499743), (17.2447897969, 38.632187776), (14.6503782733, 58.1500495624))
        make_face()
        with Locations((-2.6661262382, -2.1749504376)):
            Circle(F0_R, mode=Mode.SUBTRACT)
        with Locations((-2.6661262382, -2.1749504376)):
            Circle(F0_R)
    extrude(amount=-F6_DEPTH)

    # F0 (on Top) → F7 (cut)
    with BuildSketch(Plane.XY):
        with BuildLine():
            Line((34.4218706071, 58.1500495624), (19.9104769166, 58.1500495624))
            ThreePointArc((19.9104769166, 58.1500495624), (20.3855526974, 41.2207574466), (36.9338737618, 44.823492309))
            Line((36.9338737618, 44.823492309), (36.9338737618, 54.9412068158))
            ThreePointArc((36.9338737618, 54.9412068158), (35.8277658776, 56.6629706268), (34.4218706071, 58.1500495624))
        make_face()
        with BuildLine():
            ThreePointArc((34.4218706071, 58.1500495624), (27.1661737618, 60.8823495624), (19.9104769166, 58.1500495624))
            Line((19.9104769166, 58.1500495624), (34.4218706071, 58.1500495624))
        make_face()
        with BuildLine():
            Line((36.9338737618, 54.9412068158), (36.9338737618, 44.823492309))
            ThreePointArc((36.9338737618, 44.823492309), (37.8536594343, 47.2789575443), (38.1661737618, 49.8823495624))
            ThreePointArc((38.1661737618, 49.8823495624), (37.8536594343, 52.4857415805), (36.9338737618, 54.9412068158))
        make_face()
        with BuildLine():
            Line((-25.2427293929, 58.1500495624), (-39.7541230834, 58.1500495624))
            ThreePointArc((-39.7541230834, 58.1500495624), (-41.160018354, 56.6629706268), (-42.2661262382, 54.9412068158))
            Line((-42.2661262382, 54.9412068158), (-42.2661262382, 44.823492309))
            ThreePointArc((-42.2661262382, 44.823492309), (-29.8950342201, 39.1948638899), (-21.4984262382, 49.8823495624))
            ThreePointArc((-21.4984262382, 49.8823495624), (-22.4781302022, 54.4203741713), (-25.2427293929, 58.1500495624))
        make_face()
        with BuildLine():
            ThreePointArc((-25.2427293929, 58.1500495624), (-32.4984262382, 60.8823495624), (-39.7541230834, 58.1500495624))
            Line((-39.7541230834, 58.1500495624), (-25.2427293929, 58.1500495624))
        make_face()
        with BuildLine():
            Line((-42.2661262382, 44.823492309), (-42.2661262382, 54.9412068158))
            ThreePointArc((-42.2661262382, 54.9412068158), (-43.4984262382, 49.8823495624), (-42.2661262382, 44.823492309))
        make_face()
        with BuildLine():
            Line((36.9338737618, -59.291107691), (36.9338737618, -49.1733931842))
            ThreePointArc((36.9338737618, -49.1733931842), (20.3855526974, -45.5706583218), (19.9104769166, -62.4999504376))
            Line((19.9104769166, -62.4999504376), (34.4218706071, -62.4999504376))
            ThreePointArc((34.4218706071, -62.4999504376), (35.8277658776, -61.012871502), (36.9338737618, -59.291107691))
        make_face()
        with BuildLine():
            ThreePointArc((38.1661737618, -54.2322504376), (37.8536594343, -51.6288584195), (36.9338737618, -49.1733931842))
            Line((36.9338737618, -49.1733931842), (36.9338737618, -59.291107691))
            ThreePointArc((36.9338737618, -59.291107691), (37.8536594343, -56.8356424557), (38.1661737618, -54.2322504376))
        make_face()
        with BuildLine():
            Line((34.4218706071, -62.4999504376), (19.9104769166, -62.4999504376))
            ThreePointArc((19.9104769166, -62.4999504376), (27.1661737618, -65.2322504376), (34.4218706071, -62.4999504376))
        make_face()
        with BuildLine():
            ThreePointArc((-21.4984262382, -54.2322504376), (-29.8950342201, -43.5447647651), (-42.2661262382, -49.1733931842))
            Line((-42.2661262382, -49.1733931842), (-42.2661262382, -59.291107691))
            ThreePointArc((-42.2661262382, -59.291107691), (-41.160018354, -61.012871502), (-39.7541230834, -62.4999504376))
            Line((-39.7541230834, -62.4999504376), (-25.2427293929, -62.4999504376))
            ThreePointArc((-25.2427293929, -62.4999504376), (-22.4781302022, -58.7702750465), (-21.4984262382, -54.2322504376))
        make_face()
        with BuildLine():
            Line((-42.2661262382, -59.291107691), (-42.2661262382, -49.1733931842))
            ThreePointArc((-42.2661262382, -49.1733931842), (-43.4984262382, -54.2322504376), (-42.2661262382, -59.291107691))
        make_face()
        with BuildLine():
            ThreePointArc((-39.7541230834, -62.4999504376), (-32.4984262382, -65.2322504376), (-25.2427293929, -62.4999504376))
            Line((-25.2427293929, -62.4999504376), (-39.7541230834, -62.4999504376))
        make_face()
    extrude(amount=-F7_DEPTH, mode=Mode.SUBTRACT)

    # F8 (on face) → F9 (cut)
    with BuildSketch(Plane.XY):
        with Locations((-2.6661262382, -2.1749504376)):
            Circle(F8_R)
    extrude(amount=-F9_DEPTH, mode=Mode.SUBTRACT)

    # F4 (on face) → F10 (cut)
    with BuildSketch(Plane(origin=(0, 0, -5), x_dir=(1, 0, 0), z_dir=(0, 0, -1))):
        with Locations((-2.6661262382, 2.1749504376)):
            Circle(F4_R_3)
        with Locations((-2.6661262382, 2.1749504376)):
            Circle(F4_R_4, mode=Mode.SUBTRACT)
    extrude(amount=F10_DEPTH, mode=Mode.SUBTRACT)

    # F11 (radius 5 in the source; OpenCascade refuses exactly that, so slightly less here)
    f11_edges = [f1.edges().sort_by_distance(p)[0] for p in [
        (-32.666126, -2.17495, -5),
        (-15.366126, -2.17495, -5),
    ]]
    fillet(f11_edges, radius=F11_R)


solid = f1.part
